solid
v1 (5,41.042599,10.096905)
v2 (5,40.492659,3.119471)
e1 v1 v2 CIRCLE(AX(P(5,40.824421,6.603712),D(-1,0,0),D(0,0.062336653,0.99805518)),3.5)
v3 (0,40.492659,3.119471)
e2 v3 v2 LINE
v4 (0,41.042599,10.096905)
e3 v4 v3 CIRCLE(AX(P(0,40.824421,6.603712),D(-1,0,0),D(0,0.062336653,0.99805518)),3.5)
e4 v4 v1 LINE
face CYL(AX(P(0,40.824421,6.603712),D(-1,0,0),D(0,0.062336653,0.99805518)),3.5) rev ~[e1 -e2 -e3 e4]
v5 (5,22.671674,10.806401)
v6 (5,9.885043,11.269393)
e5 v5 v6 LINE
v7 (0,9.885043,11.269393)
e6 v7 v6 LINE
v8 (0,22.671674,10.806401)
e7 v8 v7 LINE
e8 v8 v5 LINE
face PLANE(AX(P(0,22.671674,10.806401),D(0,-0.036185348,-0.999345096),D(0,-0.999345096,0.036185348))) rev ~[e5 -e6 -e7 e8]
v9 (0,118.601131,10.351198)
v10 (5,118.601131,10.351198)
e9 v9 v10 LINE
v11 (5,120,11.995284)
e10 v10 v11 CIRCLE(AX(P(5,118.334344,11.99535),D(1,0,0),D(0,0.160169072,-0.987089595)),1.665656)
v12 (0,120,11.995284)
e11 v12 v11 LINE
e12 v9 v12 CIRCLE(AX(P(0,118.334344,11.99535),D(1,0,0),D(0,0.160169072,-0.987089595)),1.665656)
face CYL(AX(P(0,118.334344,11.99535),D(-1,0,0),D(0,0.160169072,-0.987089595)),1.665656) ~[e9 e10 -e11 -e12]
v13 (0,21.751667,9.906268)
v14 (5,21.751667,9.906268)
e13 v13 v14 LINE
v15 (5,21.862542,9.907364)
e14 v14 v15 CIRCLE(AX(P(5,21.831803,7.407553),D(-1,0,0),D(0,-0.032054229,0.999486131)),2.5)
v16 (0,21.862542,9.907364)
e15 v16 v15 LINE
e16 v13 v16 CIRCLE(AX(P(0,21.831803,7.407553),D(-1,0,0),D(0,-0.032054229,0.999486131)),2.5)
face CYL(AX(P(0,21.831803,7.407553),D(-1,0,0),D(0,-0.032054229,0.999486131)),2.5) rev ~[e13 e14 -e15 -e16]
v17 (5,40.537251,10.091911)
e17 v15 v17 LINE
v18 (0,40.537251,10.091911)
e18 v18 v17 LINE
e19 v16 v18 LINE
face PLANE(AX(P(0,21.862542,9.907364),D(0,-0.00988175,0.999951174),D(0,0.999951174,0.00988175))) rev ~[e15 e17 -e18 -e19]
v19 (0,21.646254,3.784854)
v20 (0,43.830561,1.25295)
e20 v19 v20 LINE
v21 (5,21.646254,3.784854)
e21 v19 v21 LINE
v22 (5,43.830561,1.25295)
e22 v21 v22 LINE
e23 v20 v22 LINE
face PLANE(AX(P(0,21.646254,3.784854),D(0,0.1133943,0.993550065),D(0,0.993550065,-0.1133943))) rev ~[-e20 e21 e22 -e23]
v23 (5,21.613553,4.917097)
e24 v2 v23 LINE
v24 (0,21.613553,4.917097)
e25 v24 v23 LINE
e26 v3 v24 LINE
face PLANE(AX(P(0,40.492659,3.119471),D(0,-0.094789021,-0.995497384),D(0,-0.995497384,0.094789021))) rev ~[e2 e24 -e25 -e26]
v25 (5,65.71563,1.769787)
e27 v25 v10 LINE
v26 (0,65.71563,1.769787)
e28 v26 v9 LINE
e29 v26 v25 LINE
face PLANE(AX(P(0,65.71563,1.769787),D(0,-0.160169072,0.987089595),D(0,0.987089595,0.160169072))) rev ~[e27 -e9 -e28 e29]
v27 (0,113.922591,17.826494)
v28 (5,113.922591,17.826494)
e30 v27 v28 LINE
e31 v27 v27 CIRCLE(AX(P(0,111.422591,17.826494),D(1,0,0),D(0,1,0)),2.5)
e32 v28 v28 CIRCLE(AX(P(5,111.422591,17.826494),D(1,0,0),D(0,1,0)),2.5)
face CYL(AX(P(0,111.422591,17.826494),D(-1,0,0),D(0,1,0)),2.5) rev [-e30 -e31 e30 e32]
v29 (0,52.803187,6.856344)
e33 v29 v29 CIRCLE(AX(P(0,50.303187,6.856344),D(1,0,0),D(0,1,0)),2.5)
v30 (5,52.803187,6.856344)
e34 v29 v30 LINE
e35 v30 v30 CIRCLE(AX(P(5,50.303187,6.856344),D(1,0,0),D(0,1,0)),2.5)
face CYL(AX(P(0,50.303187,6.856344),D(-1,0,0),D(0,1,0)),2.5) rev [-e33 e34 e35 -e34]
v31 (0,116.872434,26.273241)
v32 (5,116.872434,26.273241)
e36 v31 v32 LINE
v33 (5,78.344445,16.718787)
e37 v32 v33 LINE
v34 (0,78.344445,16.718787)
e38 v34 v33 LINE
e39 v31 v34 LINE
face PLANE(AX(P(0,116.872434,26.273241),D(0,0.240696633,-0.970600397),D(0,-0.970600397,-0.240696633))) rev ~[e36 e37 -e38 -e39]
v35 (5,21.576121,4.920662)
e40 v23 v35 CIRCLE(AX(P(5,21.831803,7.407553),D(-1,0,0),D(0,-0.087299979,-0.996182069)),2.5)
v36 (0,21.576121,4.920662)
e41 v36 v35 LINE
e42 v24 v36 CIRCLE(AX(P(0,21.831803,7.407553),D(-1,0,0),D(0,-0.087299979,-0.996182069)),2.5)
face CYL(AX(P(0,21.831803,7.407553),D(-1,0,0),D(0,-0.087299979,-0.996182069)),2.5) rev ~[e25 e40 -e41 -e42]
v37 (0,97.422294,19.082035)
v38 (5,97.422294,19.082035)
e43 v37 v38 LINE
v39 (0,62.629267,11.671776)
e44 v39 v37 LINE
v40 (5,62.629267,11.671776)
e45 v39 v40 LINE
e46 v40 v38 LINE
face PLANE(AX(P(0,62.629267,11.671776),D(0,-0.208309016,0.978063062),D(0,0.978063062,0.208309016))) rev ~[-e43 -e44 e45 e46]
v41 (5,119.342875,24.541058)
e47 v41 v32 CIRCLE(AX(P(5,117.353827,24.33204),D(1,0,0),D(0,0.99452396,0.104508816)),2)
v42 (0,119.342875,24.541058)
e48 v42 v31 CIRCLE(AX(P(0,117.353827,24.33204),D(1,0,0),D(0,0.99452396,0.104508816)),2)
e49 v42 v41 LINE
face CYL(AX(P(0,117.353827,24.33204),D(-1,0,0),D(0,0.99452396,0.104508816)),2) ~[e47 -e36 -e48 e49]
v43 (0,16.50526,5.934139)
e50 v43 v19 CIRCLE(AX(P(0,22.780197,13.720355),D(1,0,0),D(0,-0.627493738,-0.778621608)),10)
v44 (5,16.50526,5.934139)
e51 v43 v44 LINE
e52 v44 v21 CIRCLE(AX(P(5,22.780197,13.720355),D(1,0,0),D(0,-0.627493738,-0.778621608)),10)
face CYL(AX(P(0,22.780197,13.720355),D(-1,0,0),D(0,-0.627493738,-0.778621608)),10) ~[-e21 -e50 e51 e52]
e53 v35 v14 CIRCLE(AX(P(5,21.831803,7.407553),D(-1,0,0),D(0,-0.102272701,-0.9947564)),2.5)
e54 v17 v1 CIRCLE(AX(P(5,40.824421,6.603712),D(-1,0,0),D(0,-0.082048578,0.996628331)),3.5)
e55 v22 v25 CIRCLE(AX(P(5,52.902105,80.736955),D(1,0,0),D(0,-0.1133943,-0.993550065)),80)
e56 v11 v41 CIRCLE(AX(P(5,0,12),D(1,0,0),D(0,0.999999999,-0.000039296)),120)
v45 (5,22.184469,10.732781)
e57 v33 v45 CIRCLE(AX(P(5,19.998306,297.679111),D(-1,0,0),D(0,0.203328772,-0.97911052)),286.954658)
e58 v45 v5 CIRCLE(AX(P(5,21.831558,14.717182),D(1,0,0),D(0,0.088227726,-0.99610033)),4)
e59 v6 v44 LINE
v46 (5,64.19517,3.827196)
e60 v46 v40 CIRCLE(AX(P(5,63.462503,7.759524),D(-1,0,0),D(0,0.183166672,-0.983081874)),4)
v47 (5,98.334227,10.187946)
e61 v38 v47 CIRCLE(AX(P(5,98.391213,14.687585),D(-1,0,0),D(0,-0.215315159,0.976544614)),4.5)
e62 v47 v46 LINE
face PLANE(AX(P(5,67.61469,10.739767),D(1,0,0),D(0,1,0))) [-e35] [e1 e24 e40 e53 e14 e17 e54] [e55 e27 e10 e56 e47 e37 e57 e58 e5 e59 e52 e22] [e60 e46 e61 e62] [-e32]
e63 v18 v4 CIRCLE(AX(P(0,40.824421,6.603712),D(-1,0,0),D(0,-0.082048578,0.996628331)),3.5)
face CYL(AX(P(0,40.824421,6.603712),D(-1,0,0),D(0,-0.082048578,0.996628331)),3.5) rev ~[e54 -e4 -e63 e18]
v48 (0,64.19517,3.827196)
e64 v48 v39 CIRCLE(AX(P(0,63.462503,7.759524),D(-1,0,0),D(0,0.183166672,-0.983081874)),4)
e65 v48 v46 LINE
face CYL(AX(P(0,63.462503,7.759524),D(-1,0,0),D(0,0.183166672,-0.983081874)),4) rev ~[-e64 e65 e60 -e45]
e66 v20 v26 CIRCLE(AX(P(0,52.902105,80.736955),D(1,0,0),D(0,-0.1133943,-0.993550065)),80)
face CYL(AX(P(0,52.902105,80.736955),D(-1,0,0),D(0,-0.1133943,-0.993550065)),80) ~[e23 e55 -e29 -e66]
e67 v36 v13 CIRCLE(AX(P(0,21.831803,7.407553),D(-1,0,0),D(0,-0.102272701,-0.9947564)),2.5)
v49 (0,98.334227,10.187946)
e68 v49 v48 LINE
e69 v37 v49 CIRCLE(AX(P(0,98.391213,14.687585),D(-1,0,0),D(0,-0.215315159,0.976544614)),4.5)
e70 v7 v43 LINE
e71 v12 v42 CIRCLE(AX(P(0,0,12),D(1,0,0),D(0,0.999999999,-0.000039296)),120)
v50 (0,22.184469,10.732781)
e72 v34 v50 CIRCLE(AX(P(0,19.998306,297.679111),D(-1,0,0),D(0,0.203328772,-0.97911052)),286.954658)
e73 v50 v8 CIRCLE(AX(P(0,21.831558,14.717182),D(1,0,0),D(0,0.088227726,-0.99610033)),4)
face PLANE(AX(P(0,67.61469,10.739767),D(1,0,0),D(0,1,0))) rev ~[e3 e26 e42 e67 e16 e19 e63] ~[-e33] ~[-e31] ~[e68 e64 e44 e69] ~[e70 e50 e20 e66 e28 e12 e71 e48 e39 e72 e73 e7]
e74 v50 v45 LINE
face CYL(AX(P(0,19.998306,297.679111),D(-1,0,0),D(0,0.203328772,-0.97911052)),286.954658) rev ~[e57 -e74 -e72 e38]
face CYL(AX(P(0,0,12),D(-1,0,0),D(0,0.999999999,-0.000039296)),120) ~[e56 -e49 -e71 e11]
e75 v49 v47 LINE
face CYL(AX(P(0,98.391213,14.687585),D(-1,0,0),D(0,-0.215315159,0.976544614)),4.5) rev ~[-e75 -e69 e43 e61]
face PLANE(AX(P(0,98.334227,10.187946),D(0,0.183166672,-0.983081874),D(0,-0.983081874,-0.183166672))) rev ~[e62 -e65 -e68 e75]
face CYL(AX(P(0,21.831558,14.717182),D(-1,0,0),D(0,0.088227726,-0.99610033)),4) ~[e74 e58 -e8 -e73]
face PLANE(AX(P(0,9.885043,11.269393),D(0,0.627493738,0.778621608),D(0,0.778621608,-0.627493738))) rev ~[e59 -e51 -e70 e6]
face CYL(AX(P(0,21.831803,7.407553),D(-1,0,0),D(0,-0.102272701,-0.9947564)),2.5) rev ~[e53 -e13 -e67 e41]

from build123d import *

# Parameters (mm, degrees)
F0_R     = 2.5
F1_DEPTH = 5


# Not quite as in the source:
# - a feature names something its author has since deleted; it is built from what else it names


with BuildPart() as f1:
    # F0 (on Right) → F1 (new body)
    with BuildSketch(Plane.YZ):
        with BuildLine():
            ThreePointArc((118.6011307413, 10.3511984734), (119.6029410321, 10.9159653279), (119.9999999073, 11.9952844227))
            ThreePointArc((119.9999999073, 11.9952844227), (119.8357295493, 18.2767765127), (119.3428752162, 24.5410579746))
            ThreePointArc((119.3428752162, 24.5410579746), (118.5020303548, 25.9696085801), (116.872434029, 26.2732411356))
            Line((116.872434029, 26.2732411356), (78.344444671, 16.7187866332))
            ThreePointArc((78.344444671, 16.7187866332), (50.4120849121, 12.3407543123), (22.1844688263, 10.7327808001))
            ThreePointArc((22.1844688263, 10.7327808001), (22.4292060309, 10.7620820299), (22.6716738588, 10.8064014821))
            Line((22.6716738588, 10.8064014821), (9.8850433167, 11.2693933781))
            Line((9.8850433167, 11.2693933781), (16.5052597895, 5.9341389572))
            ThreePointArc((16.5052597895, 5.9341389572), (18.9230306979, 4.4941821172), (21.6462541623, 3.7848543869))
            Line((21.6462541623, 3.7848543869), (43.8305606526, 1.2529498543))
            ThreePointArc((43.8305606526, 1.2529498543), (54.7908574561, 0.7592543704), (65.7156304083, 1.7697874952))
            Line((65.7156304083, 1.7697874952), (118.6011307413, 10.3511984734))
        make_face()
        with BuildLine():
            ThreePointArc((41.0425990366, 10.096905354), (44.3135999527, 6.3287058646), (40.4926591764, 3.1194713813))
            Line((40.4926591764, 3.1194713813), (21.6135530725, 4.9170973917))
            ThreePointArc((21.6135530725, 4.9170973917), (21.5948304706, 4.9188091028), (21.5761212705, 4.9206615636))
            ThreePointArc((21.5761212705, 4.9206615636), (19.3333513171, 7.4955245428), (21.7516674536, 9.9062678907))
            ThreePointArc((21.7516674536, 9.9062678907), (21.8070986498, 9.9074304985), (21.8625419965, 9.9073635786))
            Line((21.8625419965, 9.9073635786), (40.5372507264, 10.0919113847))
            ThreePointArc((40.5372507264, 10.0919113847), (40.7898346274, 10.1035413352), (41.0425990366, 10.096905354))
        make_face(mode=Mode.SUBTRACT)
        with Locations((50.3031872213, 6.8563437089)):
            Circle(F0_R, mode=Mode.SUBTRACT)
        with BuildLine():
            ThreePointArc((97.4222943066, 19.082035474), (102.8677433707, 15.1465744396), (98.3342272396, 10.1879455412))
            Line((98.3342272396, 10.1879455412), (64.1951699406, 3.8271960831))
            ThreePointArc((64.1951699406, 3.8271960831), (59.5398910648, 6.9765078631), (62.6292671904, 11.6717758272))
            Line((62.6292671904, 11.6717758272), (97.4222943066, 19.082035474))
        make_face(mode=Mode.SUBTRACT)
        with Locations((111.4225909114, 17.8264938295)):
            Circle(F0_R, mode=Mode.SUBTRACT)
    extrude(amount=F1_DEPTH)


solid = f1.part
